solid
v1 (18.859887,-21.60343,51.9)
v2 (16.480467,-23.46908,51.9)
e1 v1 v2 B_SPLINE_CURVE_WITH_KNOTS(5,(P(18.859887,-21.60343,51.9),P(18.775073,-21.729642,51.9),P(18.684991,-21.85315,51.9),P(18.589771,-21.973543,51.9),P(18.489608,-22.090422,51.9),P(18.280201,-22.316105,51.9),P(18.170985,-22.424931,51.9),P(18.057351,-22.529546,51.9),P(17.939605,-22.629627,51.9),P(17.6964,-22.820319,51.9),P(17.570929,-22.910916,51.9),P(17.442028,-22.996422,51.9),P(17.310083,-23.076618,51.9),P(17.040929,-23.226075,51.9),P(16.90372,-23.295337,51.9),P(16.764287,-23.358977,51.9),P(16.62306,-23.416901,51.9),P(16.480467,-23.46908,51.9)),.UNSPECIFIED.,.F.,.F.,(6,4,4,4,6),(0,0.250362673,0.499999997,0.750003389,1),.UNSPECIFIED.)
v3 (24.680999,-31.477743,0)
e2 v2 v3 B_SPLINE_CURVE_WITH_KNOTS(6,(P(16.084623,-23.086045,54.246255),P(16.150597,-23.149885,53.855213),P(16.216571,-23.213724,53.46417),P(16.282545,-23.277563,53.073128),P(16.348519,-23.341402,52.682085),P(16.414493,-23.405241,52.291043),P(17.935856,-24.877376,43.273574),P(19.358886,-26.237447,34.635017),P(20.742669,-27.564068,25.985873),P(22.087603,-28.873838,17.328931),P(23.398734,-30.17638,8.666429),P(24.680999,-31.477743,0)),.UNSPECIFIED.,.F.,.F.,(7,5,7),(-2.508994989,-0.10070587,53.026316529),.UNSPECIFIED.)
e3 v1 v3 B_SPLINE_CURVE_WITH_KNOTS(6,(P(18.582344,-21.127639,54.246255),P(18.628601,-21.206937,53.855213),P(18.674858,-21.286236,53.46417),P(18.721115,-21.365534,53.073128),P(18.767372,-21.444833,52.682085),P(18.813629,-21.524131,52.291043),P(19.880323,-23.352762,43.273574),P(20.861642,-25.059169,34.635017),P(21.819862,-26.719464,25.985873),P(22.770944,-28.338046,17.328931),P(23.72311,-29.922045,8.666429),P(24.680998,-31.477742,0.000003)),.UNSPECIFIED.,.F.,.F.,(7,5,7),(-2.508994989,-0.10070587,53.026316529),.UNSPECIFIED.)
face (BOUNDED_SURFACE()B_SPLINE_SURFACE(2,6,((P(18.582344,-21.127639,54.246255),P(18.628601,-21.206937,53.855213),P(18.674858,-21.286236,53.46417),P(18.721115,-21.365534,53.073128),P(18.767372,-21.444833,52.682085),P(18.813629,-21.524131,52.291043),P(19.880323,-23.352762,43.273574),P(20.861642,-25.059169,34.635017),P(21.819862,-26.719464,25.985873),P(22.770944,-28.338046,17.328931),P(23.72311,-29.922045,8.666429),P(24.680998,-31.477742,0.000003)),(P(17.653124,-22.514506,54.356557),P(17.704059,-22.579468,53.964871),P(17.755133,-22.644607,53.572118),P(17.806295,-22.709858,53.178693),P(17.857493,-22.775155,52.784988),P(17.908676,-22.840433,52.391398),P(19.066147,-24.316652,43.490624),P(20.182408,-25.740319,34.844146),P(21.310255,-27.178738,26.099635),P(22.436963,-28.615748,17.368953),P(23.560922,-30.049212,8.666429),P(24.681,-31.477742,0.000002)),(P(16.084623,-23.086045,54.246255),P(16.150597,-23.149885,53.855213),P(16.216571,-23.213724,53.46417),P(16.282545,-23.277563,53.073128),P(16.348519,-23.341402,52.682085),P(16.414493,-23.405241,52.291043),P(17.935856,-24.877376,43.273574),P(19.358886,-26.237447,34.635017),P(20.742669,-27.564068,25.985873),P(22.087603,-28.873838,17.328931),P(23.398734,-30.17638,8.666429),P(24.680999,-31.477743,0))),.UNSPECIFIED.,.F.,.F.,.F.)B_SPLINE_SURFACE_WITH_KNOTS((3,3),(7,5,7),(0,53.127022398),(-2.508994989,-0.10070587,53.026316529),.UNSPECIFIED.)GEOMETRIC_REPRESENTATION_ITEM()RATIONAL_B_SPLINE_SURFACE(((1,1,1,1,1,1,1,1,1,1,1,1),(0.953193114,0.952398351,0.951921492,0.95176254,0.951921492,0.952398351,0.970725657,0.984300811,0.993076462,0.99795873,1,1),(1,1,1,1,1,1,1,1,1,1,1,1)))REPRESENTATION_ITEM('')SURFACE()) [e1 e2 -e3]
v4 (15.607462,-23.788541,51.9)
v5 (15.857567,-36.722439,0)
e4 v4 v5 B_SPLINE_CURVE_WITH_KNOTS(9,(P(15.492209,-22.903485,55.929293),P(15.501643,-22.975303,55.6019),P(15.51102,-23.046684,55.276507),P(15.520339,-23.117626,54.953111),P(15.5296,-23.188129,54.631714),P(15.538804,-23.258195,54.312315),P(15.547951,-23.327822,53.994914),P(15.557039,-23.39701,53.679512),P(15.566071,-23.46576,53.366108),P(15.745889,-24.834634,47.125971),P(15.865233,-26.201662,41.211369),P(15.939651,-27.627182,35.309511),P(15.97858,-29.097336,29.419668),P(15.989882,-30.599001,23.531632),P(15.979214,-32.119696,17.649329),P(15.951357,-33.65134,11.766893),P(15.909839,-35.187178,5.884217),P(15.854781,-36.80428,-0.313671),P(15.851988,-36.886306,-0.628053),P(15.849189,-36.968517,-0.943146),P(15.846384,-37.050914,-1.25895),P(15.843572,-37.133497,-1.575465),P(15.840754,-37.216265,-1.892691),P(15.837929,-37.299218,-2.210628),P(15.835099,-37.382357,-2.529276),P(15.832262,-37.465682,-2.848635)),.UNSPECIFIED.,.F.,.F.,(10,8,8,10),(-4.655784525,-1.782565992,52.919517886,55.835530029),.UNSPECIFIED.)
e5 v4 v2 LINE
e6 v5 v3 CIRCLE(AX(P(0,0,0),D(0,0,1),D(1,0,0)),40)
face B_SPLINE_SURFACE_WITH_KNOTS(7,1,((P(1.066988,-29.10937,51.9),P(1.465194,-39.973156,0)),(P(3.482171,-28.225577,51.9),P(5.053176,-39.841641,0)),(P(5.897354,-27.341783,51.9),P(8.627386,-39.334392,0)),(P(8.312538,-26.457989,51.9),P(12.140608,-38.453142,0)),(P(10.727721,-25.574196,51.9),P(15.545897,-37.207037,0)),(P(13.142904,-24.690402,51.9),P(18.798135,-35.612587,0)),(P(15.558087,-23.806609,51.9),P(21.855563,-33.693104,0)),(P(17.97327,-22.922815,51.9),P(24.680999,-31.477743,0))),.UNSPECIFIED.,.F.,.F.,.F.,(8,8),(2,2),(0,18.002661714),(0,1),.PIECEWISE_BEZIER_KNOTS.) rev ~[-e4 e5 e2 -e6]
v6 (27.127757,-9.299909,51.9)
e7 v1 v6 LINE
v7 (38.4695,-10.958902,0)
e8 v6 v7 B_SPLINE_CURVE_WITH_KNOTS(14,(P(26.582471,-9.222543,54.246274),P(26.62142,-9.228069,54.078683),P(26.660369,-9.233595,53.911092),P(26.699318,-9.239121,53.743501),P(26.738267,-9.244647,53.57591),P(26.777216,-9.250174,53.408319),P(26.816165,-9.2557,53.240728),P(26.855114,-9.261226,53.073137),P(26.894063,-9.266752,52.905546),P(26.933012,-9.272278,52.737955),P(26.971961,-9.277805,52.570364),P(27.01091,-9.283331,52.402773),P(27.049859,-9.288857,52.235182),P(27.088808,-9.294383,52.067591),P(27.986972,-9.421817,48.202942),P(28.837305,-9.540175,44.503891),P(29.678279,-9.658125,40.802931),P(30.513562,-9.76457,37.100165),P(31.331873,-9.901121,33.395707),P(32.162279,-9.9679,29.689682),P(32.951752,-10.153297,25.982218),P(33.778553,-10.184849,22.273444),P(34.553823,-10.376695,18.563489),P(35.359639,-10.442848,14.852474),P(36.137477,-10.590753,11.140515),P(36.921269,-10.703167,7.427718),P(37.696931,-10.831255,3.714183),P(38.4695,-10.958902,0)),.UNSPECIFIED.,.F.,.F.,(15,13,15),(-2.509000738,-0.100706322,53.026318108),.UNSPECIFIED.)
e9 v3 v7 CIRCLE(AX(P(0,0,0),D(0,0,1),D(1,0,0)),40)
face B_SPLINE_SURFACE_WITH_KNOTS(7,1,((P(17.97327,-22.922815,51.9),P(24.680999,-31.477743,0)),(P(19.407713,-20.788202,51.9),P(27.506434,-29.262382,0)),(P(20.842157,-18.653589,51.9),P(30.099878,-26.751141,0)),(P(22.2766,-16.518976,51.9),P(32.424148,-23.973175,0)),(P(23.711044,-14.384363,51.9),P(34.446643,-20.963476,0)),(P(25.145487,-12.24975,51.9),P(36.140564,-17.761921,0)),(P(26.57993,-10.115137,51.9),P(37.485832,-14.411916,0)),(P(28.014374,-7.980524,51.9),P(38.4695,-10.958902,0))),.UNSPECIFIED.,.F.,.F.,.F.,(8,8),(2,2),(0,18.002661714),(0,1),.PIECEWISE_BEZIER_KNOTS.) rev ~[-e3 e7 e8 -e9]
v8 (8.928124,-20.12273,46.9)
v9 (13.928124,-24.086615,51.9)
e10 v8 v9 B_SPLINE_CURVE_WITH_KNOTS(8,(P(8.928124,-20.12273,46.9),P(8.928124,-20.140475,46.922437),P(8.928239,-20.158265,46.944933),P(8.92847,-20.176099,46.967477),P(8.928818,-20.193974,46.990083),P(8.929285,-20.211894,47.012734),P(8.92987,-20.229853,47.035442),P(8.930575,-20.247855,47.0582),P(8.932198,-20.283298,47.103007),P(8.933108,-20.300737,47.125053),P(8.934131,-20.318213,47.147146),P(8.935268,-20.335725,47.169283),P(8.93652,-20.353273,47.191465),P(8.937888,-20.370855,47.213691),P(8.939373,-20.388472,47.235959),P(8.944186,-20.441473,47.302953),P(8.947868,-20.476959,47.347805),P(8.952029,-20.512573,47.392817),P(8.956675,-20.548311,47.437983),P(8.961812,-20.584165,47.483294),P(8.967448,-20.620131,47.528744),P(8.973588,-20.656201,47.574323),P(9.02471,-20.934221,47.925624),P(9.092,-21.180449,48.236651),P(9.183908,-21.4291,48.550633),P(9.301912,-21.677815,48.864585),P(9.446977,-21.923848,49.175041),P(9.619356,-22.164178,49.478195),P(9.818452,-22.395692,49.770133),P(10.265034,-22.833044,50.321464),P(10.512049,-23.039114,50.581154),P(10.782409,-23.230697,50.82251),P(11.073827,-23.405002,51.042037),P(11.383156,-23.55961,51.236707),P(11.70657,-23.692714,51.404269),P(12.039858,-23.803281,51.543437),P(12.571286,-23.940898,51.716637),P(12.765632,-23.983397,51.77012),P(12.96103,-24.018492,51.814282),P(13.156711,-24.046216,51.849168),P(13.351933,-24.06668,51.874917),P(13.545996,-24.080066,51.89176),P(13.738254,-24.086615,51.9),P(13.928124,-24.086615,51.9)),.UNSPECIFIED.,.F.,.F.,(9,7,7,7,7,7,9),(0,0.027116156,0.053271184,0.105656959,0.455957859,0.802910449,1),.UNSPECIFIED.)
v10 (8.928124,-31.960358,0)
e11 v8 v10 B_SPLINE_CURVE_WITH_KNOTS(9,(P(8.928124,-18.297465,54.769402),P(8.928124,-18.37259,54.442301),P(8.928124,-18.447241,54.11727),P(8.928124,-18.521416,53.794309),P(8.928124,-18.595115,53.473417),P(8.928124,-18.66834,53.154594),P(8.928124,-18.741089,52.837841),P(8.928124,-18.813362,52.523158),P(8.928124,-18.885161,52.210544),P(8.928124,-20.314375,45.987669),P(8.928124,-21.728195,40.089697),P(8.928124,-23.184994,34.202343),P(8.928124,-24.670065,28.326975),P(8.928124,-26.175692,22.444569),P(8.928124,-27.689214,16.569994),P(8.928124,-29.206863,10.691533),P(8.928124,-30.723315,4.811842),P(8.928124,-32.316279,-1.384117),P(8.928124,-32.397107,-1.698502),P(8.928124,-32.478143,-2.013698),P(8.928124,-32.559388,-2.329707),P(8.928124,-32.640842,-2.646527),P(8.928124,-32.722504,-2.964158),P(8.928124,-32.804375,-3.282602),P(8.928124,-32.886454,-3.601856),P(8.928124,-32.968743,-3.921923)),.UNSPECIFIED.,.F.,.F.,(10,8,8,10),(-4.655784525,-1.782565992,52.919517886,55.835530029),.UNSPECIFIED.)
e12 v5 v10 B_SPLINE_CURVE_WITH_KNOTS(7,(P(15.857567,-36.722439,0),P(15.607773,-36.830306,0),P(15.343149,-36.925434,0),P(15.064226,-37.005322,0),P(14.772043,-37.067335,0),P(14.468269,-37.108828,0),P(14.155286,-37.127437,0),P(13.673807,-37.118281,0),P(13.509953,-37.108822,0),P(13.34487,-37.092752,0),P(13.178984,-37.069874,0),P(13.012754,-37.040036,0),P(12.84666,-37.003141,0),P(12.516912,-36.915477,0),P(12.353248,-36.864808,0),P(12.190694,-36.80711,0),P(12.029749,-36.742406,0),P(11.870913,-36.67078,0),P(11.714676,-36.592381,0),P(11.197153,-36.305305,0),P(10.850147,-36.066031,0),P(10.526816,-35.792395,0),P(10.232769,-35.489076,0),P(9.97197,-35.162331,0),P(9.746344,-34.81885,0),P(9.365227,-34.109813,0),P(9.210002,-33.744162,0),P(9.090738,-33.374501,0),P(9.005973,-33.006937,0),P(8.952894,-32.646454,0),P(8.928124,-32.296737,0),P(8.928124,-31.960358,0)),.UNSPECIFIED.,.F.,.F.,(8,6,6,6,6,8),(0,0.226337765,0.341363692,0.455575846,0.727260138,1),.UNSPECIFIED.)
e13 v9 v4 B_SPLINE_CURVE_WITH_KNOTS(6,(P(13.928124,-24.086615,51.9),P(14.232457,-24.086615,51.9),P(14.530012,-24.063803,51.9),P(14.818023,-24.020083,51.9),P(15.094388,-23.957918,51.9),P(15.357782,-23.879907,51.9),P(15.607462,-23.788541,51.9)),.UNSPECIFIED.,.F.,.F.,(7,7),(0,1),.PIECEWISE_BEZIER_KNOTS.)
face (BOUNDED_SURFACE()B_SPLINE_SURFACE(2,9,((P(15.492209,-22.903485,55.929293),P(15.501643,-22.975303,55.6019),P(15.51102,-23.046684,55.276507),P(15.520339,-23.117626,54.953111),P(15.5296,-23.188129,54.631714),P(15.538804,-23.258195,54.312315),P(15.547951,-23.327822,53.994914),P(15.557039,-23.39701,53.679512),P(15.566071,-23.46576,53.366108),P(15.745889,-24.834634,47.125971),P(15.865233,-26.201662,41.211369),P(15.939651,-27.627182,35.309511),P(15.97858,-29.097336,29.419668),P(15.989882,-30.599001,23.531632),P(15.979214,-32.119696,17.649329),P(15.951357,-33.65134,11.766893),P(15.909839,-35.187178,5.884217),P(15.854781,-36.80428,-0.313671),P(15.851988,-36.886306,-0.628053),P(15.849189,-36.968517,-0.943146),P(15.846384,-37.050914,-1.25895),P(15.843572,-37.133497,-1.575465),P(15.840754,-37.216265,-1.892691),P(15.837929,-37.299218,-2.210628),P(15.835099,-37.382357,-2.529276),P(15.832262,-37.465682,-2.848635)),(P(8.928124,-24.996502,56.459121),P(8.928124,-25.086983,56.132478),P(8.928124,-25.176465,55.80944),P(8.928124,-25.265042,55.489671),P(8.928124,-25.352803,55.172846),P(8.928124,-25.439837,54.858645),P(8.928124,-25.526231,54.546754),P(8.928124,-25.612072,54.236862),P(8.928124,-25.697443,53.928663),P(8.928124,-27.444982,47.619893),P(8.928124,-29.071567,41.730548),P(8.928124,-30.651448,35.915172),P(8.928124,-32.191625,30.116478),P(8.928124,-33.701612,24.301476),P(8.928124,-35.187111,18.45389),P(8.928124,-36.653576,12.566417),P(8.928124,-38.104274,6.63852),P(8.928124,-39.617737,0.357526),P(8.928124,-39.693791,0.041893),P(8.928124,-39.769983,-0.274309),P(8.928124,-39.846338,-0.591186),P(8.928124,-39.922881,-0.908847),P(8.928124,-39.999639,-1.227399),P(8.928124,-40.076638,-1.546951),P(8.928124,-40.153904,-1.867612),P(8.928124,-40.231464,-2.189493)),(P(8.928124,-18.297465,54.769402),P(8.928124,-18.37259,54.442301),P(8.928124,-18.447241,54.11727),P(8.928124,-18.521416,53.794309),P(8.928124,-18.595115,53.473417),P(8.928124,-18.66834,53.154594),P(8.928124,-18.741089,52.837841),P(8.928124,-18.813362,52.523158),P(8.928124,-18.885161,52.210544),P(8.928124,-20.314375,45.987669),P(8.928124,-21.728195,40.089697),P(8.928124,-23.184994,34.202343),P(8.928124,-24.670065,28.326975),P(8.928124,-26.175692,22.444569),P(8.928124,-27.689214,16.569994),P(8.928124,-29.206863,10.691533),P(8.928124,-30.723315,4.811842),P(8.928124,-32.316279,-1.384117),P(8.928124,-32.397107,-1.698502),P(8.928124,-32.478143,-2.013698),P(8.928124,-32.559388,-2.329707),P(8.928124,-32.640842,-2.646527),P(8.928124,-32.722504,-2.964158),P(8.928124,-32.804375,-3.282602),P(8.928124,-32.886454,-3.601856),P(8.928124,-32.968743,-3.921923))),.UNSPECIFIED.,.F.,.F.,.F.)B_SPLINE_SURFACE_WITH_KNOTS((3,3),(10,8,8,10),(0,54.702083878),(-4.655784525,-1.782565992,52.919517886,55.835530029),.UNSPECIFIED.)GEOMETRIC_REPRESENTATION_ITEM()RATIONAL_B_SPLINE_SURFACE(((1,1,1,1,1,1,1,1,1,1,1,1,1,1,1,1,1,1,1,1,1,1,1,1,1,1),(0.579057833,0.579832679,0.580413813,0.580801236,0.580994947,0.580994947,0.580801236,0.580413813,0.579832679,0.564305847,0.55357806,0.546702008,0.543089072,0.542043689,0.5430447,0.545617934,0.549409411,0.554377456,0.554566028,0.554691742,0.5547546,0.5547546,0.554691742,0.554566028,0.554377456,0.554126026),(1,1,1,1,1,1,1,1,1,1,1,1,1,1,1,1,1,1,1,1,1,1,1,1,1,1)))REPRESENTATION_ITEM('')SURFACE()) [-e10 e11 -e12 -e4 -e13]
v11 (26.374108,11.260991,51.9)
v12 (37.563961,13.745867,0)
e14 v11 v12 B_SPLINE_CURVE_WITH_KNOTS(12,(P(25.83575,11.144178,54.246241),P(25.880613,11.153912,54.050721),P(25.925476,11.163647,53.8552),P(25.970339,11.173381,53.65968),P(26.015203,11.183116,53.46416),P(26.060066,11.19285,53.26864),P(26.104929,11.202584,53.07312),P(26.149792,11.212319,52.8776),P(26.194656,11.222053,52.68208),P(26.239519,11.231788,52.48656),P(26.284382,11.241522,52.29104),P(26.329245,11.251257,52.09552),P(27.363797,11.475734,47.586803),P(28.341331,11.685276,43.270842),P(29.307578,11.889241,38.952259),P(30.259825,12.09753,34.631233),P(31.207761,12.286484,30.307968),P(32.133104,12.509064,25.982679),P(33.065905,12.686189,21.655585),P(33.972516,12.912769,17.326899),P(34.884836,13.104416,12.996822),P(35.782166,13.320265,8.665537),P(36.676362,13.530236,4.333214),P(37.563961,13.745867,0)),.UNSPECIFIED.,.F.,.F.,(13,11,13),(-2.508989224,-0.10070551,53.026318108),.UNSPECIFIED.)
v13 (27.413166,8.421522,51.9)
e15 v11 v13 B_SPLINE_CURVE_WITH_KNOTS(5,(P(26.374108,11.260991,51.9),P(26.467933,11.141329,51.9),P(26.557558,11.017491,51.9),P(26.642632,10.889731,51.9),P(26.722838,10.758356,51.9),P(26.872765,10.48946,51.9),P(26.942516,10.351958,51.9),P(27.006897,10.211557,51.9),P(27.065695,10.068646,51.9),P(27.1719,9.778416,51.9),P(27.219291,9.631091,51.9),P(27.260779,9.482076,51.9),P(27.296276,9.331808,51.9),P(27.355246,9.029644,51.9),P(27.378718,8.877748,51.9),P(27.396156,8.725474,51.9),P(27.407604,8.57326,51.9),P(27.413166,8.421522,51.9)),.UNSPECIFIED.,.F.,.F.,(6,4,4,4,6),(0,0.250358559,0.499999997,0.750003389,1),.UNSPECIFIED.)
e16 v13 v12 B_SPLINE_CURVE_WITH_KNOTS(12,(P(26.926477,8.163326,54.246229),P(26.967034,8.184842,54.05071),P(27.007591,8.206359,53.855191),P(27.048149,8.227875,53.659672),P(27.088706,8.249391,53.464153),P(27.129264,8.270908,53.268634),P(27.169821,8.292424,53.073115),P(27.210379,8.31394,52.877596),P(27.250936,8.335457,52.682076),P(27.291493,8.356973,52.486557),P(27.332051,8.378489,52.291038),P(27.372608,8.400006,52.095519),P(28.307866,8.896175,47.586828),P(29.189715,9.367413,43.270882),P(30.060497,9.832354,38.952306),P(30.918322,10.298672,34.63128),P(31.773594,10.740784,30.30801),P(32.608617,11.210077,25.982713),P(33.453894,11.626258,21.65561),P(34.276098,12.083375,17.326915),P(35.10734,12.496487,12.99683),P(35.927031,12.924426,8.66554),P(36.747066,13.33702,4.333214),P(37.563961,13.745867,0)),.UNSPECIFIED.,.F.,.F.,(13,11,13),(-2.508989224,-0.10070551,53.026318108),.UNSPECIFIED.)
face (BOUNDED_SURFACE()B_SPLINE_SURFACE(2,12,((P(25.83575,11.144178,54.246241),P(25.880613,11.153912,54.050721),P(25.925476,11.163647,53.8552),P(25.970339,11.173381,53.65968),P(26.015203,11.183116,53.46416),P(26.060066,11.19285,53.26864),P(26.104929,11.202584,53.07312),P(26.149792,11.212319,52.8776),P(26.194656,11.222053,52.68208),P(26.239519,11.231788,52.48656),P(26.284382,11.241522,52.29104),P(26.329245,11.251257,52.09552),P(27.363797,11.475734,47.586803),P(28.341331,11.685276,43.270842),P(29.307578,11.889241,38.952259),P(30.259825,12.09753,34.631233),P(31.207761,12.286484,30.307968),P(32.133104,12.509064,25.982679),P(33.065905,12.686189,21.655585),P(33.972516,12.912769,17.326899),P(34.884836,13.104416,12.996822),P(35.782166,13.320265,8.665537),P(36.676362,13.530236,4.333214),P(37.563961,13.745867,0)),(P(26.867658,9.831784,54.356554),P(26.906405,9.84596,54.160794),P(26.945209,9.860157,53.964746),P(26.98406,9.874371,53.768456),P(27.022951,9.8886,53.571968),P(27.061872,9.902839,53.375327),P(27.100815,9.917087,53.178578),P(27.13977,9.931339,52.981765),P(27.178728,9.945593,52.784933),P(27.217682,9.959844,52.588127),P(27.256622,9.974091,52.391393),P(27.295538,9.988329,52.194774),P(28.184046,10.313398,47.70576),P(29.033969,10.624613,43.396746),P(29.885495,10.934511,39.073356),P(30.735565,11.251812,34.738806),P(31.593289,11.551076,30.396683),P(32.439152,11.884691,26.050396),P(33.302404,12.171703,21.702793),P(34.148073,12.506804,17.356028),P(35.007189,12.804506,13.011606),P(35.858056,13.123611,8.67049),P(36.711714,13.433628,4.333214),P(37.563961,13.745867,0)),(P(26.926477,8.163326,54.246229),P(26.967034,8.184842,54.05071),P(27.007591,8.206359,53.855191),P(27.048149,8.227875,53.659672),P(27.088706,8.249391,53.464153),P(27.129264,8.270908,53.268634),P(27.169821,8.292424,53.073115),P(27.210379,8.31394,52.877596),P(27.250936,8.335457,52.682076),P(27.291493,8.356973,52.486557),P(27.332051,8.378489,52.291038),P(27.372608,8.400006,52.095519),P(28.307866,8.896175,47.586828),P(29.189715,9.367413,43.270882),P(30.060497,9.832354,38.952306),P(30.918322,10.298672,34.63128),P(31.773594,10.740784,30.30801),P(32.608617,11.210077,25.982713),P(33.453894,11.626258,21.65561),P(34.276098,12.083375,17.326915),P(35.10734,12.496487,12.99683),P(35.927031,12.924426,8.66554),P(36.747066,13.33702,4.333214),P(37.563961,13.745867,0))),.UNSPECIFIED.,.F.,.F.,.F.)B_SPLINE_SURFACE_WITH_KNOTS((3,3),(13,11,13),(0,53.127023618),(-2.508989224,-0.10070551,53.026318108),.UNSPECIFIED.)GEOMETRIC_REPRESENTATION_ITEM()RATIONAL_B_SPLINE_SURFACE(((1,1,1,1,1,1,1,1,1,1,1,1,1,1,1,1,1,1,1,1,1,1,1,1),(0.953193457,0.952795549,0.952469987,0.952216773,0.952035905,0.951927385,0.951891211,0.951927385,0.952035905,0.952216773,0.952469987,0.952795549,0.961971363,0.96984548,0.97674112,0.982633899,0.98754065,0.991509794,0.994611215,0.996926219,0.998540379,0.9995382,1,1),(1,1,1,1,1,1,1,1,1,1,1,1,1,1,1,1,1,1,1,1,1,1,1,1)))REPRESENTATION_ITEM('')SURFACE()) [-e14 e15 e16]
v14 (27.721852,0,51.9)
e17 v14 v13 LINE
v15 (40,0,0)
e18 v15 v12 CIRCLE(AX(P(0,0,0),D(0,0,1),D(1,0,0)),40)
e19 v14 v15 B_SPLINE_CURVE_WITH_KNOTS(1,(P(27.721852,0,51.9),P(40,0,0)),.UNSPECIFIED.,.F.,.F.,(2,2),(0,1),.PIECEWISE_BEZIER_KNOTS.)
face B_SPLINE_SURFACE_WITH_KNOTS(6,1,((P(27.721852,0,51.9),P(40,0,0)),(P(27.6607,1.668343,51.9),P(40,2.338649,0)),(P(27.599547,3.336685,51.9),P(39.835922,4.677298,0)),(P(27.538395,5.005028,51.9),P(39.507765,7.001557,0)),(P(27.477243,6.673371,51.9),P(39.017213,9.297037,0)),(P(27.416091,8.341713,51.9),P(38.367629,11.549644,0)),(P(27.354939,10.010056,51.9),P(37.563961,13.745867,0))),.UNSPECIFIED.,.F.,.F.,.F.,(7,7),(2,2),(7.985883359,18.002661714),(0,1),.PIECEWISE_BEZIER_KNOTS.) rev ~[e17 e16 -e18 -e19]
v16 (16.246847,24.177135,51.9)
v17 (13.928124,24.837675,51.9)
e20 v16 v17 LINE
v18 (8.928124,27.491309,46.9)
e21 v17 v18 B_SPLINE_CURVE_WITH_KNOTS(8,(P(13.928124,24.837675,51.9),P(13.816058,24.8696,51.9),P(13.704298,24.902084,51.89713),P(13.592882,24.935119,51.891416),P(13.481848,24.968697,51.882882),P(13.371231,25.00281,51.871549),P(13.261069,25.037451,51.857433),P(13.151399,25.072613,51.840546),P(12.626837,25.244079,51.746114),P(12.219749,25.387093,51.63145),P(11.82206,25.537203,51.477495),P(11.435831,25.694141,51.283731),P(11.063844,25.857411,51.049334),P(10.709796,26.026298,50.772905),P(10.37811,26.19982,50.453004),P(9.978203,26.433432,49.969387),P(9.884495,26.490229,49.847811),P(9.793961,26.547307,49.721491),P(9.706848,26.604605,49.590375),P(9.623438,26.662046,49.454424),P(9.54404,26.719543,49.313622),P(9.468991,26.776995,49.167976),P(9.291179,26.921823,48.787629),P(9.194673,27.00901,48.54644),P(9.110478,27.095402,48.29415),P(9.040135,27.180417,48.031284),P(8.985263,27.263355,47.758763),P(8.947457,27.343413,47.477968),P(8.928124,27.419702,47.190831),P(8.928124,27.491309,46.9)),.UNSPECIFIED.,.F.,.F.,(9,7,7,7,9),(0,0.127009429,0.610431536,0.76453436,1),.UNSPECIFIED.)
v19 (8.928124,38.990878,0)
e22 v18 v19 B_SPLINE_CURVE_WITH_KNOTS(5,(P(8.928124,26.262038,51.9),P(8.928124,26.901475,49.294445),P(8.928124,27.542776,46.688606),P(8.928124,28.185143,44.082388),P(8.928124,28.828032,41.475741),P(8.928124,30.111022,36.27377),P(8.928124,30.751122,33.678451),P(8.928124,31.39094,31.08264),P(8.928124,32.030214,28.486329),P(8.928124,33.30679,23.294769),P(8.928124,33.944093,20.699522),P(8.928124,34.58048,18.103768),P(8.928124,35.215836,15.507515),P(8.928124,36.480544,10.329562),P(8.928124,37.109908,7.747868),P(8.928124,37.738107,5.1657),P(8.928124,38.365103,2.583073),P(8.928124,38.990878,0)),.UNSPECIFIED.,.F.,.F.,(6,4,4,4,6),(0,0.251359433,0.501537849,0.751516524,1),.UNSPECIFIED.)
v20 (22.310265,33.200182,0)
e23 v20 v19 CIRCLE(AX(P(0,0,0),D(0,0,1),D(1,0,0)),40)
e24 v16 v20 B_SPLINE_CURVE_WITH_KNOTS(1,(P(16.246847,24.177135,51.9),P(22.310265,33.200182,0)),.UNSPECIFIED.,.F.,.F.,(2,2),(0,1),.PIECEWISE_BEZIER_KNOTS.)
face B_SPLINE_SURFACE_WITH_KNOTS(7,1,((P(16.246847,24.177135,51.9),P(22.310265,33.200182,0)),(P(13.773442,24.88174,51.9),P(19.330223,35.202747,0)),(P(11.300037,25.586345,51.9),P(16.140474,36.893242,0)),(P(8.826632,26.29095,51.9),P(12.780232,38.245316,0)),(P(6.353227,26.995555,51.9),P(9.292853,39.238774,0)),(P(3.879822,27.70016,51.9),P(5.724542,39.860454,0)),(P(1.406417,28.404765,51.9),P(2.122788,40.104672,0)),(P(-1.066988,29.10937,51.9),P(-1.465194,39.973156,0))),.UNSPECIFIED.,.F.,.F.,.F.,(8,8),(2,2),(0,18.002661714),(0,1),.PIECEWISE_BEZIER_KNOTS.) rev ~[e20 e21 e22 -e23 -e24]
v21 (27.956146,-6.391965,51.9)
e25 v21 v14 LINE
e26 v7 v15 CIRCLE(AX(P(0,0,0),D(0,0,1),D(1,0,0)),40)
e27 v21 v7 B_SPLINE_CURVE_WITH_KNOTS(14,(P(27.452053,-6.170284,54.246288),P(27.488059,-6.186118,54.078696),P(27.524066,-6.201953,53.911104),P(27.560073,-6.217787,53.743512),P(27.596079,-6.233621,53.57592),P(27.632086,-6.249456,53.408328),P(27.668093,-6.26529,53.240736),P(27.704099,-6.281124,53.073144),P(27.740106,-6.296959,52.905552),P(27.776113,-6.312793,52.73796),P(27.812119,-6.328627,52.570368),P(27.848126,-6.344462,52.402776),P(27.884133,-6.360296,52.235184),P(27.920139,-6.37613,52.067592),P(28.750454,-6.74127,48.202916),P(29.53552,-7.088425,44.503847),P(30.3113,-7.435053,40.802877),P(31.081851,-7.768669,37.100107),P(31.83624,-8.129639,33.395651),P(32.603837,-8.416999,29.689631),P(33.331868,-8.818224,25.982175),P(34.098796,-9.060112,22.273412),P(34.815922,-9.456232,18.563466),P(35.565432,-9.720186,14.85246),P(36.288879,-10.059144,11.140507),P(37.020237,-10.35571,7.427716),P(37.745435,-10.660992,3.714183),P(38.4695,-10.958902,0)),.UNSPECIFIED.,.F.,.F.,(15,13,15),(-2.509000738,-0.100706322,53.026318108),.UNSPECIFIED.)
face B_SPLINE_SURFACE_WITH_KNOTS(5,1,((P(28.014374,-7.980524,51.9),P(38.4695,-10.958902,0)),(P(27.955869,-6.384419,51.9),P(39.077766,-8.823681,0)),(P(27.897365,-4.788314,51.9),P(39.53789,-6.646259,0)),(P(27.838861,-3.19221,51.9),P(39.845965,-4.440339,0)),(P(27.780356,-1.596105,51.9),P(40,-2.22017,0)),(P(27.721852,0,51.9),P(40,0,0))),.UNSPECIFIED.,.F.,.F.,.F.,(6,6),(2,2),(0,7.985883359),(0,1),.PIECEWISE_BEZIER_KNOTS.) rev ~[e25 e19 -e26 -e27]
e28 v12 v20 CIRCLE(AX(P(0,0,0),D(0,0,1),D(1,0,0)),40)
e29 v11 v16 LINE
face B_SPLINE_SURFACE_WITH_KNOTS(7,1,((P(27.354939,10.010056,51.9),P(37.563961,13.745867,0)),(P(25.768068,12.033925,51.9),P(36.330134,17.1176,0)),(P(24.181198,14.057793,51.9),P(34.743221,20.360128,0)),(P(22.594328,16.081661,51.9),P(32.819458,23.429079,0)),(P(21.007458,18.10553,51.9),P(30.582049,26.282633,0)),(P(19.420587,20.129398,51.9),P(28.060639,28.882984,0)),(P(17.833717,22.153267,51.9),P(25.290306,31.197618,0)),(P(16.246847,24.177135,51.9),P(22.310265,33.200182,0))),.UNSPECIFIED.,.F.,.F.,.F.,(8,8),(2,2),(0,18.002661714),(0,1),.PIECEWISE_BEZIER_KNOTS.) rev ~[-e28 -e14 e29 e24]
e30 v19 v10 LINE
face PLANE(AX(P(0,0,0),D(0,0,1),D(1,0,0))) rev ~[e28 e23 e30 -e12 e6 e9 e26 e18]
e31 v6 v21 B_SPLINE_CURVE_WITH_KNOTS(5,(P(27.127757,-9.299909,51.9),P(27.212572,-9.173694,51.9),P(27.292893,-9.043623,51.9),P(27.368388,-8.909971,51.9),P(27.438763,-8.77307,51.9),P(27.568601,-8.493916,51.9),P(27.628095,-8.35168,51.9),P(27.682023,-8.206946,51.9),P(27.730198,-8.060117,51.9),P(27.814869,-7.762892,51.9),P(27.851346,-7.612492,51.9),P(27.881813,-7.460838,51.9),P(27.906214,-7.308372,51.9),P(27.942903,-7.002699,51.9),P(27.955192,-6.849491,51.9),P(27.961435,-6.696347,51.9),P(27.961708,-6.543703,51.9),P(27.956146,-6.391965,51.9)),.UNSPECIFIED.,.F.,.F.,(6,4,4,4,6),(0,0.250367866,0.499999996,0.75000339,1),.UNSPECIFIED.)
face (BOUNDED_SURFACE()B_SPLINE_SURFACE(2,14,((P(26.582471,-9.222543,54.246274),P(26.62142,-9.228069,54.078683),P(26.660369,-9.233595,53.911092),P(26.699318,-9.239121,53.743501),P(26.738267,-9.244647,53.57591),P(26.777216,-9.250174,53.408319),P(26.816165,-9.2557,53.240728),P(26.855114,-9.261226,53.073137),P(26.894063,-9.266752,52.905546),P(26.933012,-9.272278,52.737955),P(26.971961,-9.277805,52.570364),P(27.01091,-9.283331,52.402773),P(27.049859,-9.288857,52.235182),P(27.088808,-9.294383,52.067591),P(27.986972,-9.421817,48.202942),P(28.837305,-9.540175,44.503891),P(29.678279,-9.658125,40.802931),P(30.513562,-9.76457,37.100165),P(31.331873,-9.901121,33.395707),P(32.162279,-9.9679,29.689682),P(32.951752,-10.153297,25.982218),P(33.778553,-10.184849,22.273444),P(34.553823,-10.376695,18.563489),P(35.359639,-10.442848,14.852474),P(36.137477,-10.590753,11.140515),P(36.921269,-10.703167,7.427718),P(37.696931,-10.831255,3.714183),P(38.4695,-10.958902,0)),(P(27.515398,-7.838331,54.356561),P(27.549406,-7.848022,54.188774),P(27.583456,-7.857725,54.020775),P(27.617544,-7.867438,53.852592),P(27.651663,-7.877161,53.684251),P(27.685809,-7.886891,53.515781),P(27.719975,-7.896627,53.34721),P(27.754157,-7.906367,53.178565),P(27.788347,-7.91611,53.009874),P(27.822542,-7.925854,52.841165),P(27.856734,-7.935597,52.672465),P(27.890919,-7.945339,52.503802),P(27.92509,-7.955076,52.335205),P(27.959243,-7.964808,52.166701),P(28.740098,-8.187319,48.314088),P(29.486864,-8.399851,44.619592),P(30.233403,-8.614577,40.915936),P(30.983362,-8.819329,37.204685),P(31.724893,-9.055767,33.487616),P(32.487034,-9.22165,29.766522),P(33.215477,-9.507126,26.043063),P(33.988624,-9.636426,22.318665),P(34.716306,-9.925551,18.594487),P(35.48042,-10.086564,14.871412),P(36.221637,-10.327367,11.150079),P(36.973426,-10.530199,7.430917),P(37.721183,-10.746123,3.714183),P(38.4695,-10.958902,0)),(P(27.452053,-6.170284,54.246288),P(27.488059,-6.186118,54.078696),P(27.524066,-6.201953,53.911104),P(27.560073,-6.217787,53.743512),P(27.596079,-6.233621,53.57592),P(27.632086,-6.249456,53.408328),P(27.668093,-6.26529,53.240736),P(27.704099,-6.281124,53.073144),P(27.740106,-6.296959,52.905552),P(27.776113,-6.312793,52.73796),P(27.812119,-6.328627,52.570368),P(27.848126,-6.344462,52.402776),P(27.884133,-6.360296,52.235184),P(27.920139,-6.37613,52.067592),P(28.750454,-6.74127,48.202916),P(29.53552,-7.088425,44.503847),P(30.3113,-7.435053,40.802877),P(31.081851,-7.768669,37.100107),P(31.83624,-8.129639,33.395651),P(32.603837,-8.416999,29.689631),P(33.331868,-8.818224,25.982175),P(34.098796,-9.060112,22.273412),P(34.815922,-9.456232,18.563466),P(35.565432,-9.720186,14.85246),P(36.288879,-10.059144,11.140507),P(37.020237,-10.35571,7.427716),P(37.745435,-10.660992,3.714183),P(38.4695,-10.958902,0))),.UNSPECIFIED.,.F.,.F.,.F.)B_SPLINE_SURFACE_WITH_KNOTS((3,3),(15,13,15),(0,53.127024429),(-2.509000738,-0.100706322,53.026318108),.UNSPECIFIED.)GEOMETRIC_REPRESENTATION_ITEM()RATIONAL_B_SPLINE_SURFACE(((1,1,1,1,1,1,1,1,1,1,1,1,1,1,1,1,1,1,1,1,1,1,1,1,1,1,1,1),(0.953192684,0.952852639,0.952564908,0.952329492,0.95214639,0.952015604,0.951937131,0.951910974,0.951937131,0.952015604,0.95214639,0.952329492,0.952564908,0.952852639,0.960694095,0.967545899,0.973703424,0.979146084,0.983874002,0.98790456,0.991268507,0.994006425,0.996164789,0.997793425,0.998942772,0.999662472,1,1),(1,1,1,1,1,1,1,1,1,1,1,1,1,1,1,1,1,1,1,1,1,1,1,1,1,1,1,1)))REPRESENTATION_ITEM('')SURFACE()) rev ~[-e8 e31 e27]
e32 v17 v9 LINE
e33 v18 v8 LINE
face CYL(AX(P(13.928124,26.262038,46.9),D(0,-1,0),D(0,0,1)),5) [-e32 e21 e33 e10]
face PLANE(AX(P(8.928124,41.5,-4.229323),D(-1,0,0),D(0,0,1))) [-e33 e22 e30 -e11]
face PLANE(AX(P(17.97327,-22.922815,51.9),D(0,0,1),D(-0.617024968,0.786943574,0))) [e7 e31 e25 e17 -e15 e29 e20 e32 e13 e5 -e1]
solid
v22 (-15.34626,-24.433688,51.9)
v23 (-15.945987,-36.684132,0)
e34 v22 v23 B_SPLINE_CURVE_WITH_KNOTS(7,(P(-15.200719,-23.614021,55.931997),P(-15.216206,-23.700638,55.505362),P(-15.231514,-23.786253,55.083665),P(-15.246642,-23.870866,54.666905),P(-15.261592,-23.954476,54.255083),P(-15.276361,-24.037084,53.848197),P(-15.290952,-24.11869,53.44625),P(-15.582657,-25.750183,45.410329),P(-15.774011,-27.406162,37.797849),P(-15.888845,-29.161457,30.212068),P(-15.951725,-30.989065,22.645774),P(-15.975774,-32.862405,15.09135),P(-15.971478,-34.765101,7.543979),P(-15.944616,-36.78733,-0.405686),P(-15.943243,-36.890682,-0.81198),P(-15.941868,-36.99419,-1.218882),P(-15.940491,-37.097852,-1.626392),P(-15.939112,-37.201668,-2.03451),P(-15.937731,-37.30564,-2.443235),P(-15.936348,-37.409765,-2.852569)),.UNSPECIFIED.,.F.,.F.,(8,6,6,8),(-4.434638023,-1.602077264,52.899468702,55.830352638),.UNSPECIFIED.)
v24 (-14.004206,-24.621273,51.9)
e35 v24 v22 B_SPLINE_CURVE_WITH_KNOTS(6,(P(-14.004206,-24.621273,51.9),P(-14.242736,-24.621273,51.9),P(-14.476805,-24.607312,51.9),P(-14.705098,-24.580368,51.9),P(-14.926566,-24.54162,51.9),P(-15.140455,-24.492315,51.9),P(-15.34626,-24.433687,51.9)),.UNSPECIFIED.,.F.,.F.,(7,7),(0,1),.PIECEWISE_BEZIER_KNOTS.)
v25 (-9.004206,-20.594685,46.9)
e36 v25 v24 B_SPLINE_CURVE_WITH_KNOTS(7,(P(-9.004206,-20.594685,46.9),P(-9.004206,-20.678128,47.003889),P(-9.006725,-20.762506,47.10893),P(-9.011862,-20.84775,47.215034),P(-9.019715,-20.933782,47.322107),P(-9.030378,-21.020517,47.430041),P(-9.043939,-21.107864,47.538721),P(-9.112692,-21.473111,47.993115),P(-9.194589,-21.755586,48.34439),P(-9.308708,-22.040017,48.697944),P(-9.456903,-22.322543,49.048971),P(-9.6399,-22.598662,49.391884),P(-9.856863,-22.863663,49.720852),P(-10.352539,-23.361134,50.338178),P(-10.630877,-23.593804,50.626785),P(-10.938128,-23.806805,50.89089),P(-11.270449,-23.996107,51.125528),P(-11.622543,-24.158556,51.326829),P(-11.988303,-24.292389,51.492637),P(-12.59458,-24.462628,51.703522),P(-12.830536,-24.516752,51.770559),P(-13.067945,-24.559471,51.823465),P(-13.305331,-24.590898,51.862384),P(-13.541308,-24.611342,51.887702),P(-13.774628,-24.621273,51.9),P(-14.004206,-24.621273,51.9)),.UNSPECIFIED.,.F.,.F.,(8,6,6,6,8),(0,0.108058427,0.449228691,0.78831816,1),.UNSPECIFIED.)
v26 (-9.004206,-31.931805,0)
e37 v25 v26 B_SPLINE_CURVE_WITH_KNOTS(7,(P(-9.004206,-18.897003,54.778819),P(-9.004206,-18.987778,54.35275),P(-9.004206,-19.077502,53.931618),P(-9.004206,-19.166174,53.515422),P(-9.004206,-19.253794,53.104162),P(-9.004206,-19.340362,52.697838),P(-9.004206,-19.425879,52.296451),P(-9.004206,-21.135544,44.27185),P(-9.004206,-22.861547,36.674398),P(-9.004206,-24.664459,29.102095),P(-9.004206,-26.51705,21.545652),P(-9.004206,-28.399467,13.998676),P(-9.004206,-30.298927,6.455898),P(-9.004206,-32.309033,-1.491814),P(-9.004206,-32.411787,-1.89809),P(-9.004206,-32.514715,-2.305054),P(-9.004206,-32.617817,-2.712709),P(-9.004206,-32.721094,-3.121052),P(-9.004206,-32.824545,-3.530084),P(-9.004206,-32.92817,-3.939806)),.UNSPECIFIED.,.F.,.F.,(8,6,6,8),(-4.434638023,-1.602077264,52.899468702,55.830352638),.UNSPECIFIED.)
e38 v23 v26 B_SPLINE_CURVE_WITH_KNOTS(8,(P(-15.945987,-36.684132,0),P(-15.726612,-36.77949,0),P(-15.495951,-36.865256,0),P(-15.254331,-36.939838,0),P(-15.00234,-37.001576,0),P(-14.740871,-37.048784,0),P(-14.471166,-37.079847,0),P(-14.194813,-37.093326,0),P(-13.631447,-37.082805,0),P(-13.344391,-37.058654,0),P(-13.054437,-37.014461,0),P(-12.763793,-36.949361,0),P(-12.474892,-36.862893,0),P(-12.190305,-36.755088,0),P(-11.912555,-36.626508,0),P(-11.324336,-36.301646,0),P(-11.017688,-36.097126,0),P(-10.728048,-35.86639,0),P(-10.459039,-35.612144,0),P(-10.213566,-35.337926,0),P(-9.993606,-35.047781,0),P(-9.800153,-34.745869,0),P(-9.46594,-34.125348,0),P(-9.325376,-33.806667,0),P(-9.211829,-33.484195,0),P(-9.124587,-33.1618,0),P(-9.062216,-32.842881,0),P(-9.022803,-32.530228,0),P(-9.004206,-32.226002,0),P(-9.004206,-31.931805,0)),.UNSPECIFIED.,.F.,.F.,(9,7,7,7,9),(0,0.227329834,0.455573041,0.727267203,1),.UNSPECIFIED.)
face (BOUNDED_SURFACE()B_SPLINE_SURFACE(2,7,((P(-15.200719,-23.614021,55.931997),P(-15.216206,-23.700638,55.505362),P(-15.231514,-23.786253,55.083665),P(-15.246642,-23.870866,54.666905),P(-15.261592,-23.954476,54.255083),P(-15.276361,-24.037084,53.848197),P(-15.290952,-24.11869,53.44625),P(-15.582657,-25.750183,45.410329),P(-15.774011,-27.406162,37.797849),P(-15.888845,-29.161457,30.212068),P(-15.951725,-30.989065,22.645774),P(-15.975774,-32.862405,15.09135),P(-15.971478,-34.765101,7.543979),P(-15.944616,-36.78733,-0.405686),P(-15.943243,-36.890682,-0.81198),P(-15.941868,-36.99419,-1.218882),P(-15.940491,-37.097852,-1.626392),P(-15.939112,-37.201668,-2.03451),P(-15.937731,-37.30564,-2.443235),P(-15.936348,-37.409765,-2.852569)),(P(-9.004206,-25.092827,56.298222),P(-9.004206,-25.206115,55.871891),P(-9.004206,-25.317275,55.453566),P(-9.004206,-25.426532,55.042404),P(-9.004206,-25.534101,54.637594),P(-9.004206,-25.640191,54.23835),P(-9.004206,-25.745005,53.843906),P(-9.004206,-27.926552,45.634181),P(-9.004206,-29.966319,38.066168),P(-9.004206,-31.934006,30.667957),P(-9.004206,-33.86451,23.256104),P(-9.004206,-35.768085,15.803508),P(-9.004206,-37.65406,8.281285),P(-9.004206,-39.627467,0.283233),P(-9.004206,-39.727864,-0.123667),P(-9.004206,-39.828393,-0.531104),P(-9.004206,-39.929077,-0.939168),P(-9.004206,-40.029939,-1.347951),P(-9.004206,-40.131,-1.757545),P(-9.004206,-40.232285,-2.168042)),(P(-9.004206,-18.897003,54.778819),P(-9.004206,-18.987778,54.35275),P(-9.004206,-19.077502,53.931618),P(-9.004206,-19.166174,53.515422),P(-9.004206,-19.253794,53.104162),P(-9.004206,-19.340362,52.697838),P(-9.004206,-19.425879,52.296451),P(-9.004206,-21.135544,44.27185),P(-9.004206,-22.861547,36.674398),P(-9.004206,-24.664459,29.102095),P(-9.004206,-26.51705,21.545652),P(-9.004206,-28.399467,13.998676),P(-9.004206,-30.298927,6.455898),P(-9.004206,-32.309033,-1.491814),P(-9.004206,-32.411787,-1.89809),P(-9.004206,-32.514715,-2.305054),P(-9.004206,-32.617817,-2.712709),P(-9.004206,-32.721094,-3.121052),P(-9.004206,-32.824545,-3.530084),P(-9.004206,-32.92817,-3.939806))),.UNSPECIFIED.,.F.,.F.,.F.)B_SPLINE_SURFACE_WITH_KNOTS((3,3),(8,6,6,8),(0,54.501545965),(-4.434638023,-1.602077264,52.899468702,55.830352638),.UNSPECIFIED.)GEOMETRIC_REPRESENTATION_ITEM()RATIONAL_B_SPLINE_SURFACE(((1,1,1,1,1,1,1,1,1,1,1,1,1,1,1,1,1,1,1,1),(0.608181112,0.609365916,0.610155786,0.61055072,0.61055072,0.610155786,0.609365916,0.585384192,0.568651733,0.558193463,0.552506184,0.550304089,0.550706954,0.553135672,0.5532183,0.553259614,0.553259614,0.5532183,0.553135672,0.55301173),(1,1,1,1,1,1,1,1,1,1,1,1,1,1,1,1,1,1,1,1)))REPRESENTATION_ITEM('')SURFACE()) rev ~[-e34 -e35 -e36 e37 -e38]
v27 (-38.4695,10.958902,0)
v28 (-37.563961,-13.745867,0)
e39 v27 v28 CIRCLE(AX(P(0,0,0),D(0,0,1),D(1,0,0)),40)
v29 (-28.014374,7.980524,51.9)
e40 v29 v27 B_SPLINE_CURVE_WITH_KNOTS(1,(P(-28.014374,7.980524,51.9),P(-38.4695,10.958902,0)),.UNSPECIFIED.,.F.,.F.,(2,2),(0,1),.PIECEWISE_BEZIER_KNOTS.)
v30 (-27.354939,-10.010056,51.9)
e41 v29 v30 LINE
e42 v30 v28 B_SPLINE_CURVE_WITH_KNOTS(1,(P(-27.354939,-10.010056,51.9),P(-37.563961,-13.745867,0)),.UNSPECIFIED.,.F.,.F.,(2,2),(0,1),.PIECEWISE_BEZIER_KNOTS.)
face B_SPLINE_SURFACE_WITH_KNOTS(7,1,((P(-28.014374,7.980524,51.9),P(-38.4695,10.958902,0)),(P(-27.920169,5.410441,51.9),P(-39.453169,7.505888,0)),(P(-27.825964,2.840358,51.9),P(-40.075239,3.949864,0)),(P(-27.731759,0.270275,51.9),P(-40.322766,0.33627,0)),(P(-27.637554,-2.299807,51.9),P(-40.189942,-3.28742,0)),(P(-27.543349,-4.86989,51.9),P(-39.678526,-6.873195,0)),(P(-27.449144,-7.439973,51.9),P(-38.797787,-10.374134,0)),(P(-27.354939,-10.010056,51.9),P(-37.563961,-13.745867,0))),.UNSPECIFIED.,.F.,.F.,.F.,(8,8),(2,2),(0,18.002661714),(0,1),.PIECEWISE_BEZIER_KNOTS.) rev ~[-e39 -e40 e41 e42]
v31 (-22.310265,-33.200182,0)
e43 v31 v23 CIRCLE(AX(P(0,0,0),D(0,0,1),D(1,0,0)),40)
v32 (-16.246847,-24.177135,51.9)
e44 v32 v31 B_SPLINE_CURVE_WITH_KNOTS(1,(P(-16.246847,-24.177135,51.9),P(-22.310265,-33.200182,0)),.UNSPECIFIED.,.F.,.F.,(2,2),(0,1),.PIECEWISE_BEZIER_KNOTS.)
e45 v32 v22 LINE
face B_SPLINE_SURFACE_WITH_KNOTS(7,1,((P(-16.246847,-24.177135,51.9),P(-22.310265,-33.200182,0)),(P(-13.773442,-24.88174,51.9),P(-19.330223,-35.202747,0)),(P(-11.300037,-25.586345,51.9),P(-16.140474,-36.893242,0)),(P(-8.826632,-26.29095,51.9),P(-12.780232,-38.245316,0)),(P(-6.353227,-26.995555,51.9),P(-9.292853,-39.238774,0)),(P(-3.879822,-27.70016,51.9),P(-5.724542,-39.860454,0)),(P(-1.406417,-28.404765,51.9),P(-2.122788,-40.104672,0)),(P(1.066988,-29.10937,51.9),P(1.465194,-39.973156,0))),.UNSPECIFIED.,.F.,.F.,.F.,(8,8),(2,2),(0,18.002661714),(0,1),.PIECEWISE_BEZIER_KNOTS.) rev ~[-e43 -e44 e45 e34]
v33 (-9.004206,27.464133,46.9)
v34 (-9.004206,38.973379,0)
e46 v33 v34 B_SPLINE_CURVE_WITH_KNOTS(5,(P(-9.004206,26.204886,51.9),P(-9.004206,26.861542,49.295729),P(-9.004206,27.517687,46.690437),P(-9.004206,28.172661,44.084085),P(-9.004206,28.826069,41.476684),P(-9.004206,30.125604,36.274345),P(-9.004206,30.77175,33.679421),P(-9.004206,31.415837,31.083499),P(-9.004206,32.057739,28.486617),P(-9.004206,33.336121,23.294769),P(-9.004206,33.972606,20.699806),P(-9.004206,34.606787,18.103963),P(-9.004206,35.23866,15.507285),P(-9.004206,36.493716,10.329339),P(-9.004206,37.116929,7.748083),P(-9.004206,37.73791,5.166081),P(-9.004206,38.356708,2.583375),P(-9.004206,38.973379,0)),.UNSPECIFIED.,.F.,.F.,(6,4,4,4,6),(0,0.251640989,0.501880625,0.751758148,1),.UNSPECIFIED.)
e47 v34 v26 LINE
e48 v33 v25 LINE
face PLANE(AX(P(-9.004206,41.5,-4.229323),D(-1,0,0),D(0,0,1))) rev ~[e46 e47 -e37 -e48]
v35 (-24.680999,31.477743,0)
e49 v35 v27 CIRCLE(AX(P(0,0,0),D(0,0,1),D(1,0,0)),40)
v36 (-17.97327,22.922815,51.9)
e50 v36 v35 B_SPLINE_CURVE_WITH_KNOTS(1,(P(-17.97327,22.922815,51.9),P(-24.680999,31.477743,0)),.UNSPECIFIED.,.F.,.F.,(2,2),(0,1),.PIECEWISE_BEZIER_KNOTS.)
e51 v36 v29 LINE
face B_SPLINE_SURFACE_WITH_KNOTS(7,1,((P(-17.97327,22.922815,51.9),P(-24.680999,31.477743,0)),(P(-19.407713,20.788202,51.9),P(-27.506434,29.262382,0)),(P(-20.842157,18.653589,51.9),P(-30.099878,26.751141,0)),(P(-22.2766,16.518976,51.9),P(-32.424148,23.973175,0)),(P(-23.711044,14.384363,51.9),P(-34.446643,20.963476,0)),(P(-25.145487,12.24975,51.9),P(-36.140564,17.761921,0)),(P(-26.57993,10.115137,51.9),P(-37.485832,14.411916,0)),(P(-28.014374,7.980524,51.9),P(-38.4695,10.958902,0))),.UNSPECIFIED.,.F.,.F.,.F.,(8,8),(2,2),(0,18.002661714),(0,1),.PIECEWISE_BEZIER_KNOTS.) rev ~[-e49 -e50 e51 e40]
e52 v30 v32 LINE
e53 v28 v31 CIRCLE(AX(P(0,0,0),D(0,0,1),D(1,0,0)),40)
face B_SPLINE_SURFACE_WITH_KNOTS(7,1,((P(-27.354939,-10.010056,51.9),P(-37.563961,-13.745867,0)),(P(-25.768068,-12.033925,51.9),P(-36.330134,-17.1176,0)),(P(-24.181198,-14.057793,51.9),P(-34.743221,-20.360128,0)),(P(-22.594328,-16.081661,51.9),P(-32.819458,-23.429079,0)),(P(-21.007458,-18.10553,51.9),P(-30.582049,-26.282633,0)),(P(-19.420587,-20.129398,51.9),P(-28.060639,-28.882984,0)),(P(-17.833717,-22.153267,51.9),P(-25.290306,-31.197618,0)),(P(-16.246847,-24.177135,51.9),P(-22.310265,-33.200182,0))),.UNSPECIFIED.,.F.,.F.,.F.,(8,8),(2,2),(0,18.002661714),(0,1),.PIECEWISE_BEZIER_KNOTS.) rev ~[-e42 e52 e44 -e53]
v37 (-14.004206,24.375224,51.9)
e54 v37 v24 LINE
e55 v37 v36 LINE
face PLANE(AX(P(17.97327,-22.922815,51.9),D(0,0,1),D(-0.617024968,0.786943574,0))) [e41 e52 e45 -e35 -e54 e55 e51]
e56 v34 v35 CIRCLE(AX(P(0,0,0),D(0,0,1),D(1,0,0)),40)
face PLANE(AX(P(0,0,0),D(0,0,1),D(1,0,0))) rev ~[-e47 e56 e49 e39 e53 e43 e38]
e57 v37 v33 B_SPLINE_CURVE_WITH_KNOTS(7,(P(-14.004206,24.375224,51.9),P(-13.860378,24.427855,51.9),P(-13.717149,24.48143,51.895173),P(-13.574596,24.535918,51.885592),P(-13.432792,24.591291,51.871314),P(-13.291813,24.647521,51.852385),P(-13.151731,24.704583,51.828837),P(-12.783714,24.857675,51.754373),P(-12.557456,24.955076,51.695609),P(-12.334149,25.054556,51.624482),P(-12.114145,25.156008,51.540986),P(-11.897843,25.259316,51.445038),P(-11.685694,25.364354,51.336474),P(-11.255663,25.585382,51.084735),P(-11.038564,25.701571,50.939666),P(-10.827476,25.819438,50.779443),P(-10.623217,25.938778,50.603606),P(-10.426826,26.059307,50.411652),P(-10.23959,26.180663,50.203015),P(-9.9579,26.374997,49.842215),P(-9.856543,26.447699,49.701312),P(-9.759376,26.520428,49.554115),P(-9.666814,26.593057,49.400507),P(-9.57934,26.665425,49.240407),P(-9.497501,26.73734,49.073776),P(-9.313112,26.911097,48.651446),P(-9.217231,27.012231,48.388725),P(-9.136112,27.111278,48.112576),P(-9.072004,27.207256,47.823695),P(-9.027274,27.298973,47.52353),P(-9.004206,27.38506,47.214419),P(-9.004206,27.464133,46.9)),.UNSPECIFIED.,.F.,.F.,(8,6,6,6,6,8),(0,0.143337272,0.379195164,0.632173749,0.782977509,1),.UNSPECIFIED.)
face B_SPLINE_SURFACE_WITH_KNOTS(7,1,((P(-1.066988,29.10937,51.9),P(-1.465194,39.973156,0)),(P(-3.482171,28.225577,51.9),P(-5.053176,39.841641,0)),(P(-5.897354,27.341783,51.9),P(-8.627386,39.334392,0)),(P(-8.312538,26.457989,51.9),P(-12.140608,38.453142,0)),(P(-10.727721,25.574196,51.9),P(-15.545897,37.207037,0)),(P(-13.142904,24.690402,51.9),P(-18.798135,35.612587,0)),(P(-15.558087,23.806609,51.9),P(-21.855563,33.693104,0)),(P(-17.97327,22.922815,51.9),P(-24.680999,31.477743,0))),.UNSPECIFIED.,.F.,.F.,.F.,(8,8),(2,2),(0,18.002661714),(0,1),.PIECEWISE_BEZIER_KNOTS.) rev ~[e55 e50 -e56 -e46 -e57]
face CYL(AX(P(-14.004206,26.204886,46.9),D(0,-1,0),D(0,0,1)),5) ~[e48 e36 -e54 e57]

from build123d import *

# Parameters (mm, degrees)
F0_R     = 40
F5_W     = 17.9323302582
F5_H     = 58.3646646701
F6_DEPTH = 92.8
F7_R     = 5


with BuildPart() as f3:
    # F2 (on offset) → F3 section 0
    with BuildSketch(Plane.XY.offset(51.9)):
        Polygon((17.9732700356, -22.9228152642), (28.0143736566, -7.9805240452), (27.3549387144, 10.010056111), (16.2468469433, 24.1771350621), (-1.06698815, 29.1093701701), (-17.9732700356, 22.9228152642), (-28.0143736566, 7.9805240452), (-27.3549387144, -10.010056111), (-16.2468469433, -24.1771350621), (1.06698815, -29.1093701701), align=None)
    # F0 (on Top) → F3 section 1
    with BuildSketch(Plane.XY):
        Circle(F0_R)
    loft()

    # F5 (on offset) → F6 (cut)
    with BuildSketch(Plane.XZ.offset(-41.5)):
        with Locations((-0.0380412675, 24.9530088622)):
            Rectangle(F5_W, F5_H)
    extrude(amount=F6_DEPTH, mode=Mode.SUBTRACT)

    # F7
    f7_edges = [f3.edges().sort_by_distance(p)[0] for p in [
        (8.928124, 0.014656, 51.9),
        (-9.004206, -32.63119, 25.95596),
        (8.928124, -32.700734, 25.971852),
        (-9.004206, -0.017739, 51.9),
        (32.45945, 11.877962, 25.95),
        (33.241937, -9.469713, 25.95),
        (21.327134, -27.200279, 25.95),
    ]]
    fillet(f7_edges, radius=F7_R)


solid = f3.part
